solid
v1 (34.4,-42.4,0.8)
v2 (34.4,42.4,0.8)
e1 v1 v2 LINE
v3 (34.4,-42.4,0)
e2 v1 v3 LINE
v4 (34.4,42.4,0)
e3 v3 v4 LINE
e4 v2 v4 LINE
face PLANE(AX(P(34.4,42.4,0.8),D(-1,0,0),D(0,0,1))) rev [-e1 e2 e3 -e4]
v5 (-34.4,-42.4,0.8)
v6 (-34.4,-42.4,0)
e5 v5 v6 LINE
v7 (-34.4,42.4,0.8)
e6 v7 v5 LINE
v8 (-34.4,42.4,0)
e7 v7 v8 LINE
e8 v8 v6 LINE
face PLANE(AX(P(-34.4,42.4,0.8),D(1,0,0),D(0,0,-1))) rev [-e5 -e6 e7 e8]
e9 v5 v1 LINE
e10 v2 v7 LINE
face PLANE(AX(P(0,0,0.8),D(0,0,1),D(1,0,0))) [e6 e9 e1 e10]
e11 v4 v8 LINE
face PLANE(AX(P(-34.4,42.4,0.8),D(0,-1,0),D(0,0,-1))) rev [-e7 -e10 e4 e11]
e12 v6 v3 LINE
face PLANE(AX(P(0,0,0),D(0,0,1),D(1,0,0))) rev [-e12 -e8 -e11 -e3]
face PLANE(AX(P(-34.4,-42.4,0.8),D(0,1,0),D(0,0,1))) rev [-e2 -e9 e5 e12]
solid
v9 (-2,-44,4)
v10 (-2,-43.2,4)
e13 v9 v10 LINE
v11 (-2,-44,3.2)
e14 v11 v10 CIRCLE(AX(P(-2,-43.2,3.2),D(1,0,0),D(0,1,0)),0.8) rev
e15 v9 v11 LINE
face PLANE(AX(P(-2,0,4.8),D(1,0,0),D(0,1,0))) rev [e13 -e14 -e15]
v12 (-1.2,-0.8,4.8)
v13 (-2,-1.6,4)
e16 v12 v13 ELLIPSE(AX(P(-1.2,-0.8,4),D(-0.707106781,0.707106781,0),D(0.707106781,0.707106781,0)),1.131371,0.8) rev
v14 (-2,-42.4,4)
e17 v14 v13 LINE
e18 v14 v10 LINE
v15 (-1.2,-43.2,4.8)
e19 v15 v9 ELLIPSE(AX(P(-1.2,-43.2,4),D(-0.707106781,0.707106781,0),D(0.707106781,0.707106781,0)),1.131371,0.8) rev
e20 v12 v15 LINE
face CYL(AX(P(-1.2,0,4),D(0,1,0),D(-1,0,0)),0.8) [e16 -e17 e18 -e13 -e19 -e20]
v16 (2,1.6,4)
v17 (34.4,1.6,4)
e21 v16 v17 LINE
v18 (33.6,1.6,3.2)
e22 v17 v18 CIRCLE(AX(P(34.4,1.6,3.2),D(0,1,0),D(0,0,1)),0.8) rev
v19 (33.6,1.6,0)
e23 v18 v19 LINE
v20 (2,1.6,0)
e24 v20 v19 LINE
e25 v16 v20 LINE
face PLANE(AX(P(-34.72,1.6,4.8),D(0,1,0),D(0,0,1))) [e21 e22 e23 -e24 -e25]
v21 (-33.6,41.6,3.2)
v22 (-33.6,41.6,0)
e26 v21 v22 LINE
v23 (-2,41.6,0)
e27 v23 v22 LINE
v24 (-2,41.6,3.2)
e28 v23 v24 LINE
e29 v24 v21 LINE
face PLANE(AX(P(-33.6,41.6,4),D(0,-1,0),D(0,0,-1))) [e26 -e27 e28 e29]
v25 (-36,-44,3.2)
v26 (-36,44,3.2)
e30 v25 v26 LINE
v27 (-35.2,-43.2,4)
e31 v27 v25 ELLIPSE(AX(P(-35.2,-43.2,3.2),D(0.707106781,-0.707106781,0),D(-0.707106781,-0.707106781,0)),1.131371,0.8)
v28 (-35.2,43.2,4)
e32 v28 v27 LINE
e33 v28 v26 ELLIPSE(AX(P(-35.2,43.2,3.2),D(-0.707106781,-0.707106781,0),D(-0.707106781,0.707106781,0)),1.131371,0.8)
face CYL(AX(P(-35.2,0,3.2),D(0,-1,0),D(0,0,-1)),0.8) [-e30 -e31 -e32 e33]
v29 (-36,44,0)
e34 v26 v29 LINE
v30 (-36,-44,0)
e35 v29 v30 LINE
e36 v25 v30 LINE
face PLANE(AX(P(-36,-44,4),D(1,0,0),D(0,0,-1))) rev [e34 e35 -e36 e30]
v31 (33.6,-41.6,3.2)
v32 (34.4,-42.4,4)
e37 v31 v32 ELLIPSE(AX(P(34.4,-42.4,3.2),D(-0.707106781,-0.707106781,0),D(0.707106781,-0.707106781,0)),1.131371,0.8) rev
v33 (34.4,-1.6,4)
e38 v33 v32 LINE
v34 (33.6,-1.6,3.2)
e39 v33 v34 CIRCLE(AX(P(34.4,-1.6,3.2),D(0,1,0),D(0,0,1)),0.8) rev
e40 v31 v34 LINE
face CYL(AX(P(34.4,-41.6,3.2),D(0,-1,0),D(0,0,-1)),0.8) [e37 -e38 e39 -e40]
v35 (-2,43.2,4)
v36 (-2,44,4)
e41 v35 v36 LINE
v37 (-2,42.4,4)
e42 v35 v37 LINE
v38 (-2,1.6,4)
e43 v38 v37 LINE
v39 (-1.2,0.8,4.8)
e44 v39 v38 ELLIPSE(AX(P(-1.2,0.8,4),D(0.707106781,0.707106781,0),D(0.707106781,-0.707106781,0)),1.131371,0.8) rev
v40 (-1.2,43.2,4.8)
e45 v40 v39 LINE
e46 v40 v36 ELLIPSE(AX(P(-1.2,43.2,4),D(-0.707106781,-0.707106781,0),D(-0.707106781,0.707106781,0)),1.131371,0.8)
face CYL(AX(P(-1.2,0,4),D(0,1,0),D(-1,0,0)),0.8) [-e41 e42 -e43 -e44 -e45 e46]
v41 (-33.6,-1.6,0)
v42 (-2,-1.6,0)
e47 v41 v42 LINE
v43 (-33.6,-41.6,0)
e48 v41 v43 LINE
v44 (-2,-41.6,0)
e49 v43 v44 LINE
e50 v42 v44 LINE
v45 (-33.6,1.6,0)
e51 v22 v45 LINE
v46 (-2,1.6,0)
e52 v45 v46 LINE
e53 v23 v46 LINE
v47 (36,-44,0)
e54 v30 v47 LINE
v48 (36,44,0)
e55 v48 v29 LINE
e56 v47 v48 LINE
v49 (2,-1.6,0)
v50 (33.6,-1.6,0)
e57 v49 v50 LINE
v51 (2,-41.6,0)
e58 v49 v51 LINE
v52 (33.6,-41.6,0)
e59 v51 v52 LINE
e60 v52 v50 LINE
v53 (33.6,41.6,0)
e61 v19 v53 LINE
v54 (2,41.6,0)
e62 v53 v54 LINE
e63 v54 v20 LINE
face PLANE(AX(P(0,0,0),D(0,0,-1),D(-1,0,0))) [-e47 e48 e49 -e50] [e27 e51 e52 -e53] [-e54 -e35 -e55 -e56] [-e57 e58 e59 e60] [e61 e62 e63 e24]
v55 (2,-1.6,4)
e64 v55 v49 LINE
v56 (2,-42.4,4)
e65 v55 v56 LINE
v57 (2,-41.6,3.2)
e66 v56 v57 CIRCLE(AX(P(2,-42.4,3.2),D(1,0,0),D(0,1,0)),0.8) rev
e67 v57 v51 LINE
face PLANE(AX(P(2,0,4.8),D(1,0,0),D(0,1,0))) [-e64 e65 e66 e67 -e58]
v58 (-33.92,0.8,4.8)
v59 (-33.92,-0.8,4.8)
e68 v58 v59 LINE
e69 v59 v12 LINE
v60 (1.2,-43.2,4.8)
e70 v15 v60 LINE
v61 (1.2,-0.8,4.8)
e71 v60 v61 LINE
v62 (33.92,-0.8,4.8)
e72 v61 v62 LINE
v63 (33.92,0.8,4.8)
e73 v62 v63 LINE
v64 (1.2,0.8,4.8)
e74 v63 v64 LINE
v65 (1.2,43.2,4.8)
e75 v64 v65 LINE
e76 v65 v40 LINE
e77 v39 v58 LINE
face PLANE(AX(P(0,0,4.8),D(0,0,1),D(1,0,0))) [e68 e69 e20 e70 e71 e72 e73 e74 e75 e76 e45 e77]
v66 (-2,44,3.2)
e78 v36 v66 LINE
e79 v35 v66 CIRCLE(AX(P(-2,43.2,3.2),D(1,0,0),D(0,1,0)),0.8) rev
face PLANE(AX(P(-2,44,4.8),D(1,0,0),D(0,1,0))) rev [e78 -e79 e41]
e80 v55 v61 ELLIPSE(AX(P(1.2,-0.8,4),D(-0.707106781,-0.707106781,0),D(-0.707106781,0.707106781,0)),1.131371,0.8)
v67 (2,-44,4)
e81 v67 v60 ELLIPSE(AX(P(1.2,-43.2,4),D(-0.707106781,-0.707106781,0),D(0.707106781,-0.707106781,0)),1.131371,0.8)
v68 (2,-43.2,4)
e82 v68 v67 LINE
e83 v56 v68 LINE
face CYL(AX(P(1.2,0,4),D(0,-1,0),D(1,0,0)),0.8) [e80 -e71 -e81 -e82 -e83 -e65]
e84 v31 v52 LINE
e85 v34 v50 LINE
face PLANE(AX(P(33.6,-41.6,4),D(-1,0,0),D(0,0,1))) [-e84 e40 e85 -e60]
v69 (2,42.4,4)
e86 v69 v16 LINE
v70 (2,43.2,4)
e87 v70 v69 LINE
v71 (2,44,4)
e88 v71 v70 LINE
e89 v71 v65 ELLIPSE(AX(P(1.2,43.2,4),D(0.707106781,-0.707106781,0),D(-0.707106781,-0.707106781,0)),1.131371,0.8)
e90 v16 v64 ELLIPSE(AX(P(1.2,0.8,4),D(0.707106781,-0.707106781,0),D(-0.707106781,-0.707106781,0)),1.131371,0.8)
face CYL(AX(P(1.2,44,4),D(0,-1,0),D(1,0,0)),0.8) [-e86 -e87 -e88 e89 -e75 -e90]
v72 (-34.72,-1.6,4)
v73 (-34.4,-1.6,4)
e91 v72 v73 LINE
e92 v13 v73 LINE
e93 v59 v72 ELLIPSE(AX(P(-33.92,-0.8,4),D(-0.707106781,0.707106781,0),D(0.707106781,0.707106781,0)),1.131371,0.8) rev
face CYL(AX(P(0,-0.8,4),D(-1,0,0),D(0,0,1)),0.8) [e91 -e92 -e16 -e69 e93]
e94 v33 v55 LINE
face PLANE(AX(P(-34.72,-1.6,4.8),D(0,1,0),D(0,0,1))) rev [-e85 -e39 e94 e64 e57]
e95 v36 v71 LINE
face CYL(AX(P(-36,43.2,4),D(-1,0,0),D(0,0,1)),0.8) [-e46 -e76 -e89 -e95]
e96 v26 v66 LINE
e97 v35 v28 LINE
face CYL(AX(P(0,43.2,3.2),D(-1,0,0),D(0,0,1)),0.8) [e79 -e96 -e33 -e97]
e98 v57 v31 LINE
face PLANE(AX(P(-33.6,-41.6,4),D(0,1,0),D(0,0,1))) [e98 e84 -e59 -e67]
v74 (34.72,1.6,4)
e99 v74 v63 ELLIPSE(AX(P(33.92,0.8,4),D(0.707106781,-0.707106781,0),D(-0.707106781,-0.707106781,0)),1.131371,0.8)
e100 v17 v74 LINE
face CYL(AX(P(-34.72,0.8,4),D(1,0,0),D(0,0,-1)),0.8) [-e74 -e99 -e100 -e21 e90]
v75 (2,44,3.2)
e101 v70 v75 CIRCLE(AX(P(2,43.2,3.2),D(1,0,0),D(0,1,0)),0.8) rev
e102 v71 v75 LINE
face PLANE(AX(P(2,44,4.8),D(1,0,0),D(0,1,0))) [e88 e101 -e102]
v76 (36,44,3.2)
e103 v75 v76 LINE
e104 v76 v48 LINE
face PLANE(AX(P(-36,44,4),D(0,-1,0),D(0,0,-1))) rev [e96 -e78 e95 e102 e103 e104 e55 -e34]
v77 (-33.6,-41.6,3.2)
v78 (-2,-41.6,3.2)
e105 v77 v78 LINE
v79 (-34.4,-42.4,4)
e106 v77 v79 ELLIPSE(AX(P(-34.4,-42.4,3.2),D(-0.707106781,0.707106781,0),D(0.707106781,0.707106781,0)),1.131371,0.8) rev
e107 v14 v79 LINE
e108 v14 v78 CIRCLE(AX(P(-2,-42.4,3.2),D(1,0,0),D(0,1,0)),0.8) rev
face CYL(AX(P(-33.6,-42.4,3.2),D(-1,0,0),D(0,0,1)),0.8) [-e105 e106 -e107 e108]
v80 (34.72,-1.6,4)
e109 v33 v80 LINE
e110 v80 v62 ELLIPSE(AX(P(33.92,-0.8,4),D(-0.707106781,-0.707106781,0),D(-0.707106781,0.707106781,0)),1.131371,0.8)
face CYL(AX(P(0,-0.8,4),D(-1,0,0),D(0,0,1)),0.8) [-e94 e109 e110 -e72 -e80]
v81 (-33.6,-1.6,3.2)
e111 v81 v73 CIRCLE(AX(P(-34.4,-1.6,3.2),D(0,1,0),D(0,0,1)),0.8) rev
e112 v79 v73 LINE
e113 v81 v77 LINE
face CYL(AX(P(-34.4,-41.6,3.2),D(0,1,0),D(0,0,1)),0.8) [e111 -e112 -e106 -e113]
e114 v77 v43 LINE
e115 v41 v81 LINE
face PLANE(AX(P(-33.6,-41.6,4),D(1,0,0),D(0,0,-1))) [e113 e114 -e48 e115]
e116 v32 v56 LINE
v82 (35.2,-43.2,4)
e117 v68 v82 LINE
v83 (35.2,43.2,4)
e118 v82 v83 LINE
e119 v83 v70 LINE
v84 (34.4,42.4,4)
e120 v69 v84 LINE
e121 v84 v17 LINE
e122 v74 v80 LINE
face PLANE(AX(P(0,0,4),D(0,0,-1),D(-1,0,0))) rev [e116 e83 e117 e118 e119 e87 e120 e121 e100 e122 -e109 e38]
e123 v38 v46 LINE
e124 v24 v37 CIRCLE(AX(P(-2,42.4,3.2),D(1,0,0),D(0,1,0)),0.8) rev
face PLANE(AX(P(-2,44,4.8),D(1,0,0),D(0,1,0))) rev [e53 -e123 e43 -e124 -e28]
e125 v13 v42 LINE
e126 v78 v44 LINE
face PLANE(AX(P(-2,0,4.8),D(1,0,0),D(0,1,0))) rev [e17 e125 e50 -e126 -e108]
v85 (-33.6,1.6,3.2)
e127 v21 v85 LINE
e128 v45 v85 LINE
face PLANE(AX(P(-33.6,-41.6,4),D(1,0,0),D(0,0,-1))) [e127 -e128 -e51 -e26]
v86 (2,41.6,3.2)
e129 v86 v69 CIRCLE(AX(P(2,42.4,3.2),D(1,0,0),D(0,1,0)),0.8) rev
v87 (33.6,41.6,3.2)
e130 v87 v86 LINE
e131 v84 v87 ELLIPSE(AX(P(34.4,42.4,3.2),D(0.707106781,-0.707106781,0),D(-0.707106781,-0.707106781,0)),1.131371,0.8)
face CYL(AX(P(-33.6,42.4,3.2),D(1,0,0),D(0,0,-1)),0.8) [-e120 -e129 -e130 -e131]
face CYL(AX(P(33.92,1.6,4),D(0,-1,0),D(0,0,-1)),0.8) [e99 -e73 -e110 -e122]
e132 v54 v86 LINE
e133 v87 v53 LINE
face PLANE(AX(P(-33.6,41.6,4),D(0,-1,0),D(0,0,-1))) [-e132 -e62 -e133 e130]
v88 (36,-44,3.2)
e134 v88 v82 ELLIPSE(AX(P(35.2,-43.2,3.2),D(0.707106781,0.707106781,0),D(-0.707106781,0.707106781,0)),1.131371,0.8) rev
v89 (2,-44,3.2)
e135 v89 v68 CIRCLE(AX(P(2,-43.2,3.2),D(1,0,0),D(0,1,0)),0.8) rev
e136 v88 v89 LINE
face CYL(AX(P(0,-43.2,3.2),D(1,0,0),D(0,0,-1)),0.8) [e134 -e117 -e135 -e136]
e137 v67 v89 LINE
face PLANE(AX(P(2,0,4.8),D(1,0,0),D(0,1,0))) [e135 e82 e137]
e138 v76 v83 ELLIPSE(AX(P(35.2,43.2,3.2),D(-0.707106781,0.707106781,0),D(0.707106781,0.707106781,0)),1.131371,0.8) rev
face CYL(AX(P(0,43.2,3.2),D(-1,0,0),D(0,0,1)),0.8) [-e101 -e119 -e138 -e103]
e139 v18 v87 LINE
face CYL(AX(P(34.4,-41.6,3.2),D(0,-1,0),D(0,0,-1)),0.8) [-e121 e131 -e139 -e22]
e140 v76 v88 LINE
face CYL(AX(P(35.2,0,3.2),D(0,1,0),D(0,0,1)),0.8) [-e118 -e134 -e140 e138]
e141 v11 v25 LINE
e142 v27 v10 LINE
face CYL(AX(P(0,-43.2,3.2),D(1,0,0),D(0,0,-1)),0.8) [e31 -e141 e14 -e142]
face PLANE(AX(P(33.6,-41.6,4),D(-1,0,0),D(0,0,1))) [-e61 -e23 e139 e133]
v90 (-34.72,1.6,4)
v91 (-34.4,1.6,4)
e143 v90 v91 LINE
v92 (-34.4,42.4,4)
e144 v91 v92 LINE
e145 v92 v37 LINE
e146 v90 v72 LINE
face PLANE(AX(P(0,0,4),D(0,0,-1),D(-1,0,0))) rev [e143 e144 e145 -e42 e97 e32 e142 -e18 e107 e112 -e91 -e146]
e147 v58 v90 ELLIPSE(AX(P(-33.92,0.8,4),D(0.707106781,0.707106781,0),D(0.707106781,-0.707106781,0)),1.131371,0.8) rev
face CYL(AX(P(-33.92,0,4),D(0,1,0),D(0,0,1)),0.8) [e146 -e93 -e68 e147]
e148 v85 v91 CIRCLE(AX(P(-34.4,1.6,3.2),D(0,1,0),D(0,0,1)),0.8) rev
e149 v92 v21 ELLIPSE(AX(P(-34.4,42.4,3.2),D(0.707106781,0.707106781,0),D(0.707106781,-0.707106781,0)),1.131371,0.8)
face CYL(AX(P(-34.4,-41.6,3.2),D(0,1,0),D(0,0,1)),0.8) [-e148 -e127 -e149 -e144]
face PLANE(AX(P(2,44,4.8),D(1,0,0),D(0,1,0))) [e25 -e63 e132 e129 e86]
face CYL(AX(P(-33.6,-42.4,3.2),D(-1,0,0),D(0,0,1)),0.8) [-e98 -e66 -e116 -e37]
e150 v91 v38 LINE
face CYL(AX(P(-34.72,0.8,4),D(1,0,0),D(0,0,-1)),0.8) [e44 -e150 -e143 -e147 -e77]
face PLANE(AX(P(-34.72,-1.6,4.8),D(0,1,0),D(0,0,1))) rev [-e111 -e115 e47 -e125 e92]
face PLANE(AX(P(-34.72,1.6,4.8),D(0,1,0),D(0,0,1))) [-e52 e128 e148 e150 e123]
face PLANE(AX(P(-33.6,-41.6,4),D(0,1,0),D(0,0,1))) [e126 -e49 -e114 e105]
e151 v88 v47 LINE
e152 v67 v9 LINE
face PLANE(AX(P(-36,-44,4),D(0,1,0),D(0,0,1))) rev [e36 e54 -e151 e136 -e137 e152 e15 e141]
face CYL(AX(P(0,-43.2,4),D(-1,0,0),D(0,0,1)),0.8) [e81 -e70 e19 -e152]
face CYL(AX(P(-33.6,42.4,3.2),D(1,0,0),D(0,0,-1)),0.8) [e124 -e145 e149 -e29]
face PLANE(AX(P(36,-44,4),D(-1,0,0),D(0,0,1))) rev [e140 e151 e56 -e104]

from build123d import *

# Parameters (mm, degrees)
SKETCH1_W           = 900
SKETCH1_H           = 1100
SKETCH1_W_2         = 840
SKETCH1_H_2         = 1040
BOSS_EXTRUDE1_DEPTH = 50
FILLET1_R           = 10
SKETCH2_W           = 50
SKETCH2_H           = 1100
SKETCH2_W_2         = 868
SKETCH2_H_2         = 40
BOSS_EXTRUDE2_DEPTH = 60
FILLET2_R           = 10
SKETCH3_W           = 860
SKETCH3_H           = 1060
BOSS_EXTRUDE3_DEPTH = 10
SCALE2_SCALE        = 0.25
SCALE3_SCALE        = 0.32


with BuildPart() as part:
    # Sketch1 → Boss-Extrude1 (new body)
    with BuildSketch(Plane.XY):
        Rectangle(SKETCH1_W, SKETCH1_H)
        Rectangle(SKETCH1_W_2, SKETCH1_H_2, mode=Mode.SUBTRACT)
    extrude(amount=BOSS_EXTRUDE1_DEPTH)

    # Fillet1
    fillet1_edges = [part.edges().sort_by_distance(p)[0] for p in [
        (-450, 0, 50),
        (0, -550, 50),
        (0, -520, 50),
        (420, 0, 50),
        (0, 520, 50),
        (-420, 0, 50),
        (450, 0, 50),
        (0, 550, 50),
    ]]
    fillet(fillet1_edges, radius=FILLET1_R)

    # Sketch2 → Boss-Extrude2 (add)
    with BuildSketch(Plane.XY):
        Rectangle(SKETCH2_W, SKETCH2_H)
        Rectangle(SKETCH2_W_2, SKETCH2_H_2)
    extrude(amount=BOSS_EXTRUDE2_DEPTH)

    # Fillet2
    fillet2_edges = [part.edges().sort_by_distance(p)[0] for p in [
        (0, -550, 60),
        (-25, -285, 60),
        (-229.5, -20, 60),
        (-434, 0, 60),
        (-229.5, 20, 60),
        (-25, 285, 60),
        (0, 550, 60),
        (25, 285, 60),
        (229.5, 20, 60),
        (434, 0, 60),
        (229.5, -20, 60),
        (25, -285, 60),
    ]]
    fillet(fillet2_edges, radius=FILLET2_R - 0.0001)  # a hair under: the kernel refuses the full size


with BuildPart() as body_2:
    # Sketch3 → Boss-Extrude3 (new body)
    with BuildSketch(Plane.XY):
        Rectangle(SKETCH3_W, SKETCH3_H)
    extrude(amount=BOSS_EXTRUDE3_DEPTH)


with BuildPart() as part_1:
    # Scale2: scaled about (0, 0, 0)
    add(part.part.scale(SCALE2_SCALE))


with BuildPart() as body_2_1:
    # Scale2: scaled about (0, 0, 0)
    add(body_2.part.scale(SCALE2_SCALE))


with BuildPart() as part_2:
    # Scale3: scaled about (0, 0, 0)
    add(part_1.part.scale(SCALE3_SCALE))


with BuildPart() as body_2_2:
    # Scale3: scaled about (0, 0, 0)
    add(body_2_1.part.scale(SCALE3_SCALE))


solid = Compound([part_2.part, body_2_2.part])
